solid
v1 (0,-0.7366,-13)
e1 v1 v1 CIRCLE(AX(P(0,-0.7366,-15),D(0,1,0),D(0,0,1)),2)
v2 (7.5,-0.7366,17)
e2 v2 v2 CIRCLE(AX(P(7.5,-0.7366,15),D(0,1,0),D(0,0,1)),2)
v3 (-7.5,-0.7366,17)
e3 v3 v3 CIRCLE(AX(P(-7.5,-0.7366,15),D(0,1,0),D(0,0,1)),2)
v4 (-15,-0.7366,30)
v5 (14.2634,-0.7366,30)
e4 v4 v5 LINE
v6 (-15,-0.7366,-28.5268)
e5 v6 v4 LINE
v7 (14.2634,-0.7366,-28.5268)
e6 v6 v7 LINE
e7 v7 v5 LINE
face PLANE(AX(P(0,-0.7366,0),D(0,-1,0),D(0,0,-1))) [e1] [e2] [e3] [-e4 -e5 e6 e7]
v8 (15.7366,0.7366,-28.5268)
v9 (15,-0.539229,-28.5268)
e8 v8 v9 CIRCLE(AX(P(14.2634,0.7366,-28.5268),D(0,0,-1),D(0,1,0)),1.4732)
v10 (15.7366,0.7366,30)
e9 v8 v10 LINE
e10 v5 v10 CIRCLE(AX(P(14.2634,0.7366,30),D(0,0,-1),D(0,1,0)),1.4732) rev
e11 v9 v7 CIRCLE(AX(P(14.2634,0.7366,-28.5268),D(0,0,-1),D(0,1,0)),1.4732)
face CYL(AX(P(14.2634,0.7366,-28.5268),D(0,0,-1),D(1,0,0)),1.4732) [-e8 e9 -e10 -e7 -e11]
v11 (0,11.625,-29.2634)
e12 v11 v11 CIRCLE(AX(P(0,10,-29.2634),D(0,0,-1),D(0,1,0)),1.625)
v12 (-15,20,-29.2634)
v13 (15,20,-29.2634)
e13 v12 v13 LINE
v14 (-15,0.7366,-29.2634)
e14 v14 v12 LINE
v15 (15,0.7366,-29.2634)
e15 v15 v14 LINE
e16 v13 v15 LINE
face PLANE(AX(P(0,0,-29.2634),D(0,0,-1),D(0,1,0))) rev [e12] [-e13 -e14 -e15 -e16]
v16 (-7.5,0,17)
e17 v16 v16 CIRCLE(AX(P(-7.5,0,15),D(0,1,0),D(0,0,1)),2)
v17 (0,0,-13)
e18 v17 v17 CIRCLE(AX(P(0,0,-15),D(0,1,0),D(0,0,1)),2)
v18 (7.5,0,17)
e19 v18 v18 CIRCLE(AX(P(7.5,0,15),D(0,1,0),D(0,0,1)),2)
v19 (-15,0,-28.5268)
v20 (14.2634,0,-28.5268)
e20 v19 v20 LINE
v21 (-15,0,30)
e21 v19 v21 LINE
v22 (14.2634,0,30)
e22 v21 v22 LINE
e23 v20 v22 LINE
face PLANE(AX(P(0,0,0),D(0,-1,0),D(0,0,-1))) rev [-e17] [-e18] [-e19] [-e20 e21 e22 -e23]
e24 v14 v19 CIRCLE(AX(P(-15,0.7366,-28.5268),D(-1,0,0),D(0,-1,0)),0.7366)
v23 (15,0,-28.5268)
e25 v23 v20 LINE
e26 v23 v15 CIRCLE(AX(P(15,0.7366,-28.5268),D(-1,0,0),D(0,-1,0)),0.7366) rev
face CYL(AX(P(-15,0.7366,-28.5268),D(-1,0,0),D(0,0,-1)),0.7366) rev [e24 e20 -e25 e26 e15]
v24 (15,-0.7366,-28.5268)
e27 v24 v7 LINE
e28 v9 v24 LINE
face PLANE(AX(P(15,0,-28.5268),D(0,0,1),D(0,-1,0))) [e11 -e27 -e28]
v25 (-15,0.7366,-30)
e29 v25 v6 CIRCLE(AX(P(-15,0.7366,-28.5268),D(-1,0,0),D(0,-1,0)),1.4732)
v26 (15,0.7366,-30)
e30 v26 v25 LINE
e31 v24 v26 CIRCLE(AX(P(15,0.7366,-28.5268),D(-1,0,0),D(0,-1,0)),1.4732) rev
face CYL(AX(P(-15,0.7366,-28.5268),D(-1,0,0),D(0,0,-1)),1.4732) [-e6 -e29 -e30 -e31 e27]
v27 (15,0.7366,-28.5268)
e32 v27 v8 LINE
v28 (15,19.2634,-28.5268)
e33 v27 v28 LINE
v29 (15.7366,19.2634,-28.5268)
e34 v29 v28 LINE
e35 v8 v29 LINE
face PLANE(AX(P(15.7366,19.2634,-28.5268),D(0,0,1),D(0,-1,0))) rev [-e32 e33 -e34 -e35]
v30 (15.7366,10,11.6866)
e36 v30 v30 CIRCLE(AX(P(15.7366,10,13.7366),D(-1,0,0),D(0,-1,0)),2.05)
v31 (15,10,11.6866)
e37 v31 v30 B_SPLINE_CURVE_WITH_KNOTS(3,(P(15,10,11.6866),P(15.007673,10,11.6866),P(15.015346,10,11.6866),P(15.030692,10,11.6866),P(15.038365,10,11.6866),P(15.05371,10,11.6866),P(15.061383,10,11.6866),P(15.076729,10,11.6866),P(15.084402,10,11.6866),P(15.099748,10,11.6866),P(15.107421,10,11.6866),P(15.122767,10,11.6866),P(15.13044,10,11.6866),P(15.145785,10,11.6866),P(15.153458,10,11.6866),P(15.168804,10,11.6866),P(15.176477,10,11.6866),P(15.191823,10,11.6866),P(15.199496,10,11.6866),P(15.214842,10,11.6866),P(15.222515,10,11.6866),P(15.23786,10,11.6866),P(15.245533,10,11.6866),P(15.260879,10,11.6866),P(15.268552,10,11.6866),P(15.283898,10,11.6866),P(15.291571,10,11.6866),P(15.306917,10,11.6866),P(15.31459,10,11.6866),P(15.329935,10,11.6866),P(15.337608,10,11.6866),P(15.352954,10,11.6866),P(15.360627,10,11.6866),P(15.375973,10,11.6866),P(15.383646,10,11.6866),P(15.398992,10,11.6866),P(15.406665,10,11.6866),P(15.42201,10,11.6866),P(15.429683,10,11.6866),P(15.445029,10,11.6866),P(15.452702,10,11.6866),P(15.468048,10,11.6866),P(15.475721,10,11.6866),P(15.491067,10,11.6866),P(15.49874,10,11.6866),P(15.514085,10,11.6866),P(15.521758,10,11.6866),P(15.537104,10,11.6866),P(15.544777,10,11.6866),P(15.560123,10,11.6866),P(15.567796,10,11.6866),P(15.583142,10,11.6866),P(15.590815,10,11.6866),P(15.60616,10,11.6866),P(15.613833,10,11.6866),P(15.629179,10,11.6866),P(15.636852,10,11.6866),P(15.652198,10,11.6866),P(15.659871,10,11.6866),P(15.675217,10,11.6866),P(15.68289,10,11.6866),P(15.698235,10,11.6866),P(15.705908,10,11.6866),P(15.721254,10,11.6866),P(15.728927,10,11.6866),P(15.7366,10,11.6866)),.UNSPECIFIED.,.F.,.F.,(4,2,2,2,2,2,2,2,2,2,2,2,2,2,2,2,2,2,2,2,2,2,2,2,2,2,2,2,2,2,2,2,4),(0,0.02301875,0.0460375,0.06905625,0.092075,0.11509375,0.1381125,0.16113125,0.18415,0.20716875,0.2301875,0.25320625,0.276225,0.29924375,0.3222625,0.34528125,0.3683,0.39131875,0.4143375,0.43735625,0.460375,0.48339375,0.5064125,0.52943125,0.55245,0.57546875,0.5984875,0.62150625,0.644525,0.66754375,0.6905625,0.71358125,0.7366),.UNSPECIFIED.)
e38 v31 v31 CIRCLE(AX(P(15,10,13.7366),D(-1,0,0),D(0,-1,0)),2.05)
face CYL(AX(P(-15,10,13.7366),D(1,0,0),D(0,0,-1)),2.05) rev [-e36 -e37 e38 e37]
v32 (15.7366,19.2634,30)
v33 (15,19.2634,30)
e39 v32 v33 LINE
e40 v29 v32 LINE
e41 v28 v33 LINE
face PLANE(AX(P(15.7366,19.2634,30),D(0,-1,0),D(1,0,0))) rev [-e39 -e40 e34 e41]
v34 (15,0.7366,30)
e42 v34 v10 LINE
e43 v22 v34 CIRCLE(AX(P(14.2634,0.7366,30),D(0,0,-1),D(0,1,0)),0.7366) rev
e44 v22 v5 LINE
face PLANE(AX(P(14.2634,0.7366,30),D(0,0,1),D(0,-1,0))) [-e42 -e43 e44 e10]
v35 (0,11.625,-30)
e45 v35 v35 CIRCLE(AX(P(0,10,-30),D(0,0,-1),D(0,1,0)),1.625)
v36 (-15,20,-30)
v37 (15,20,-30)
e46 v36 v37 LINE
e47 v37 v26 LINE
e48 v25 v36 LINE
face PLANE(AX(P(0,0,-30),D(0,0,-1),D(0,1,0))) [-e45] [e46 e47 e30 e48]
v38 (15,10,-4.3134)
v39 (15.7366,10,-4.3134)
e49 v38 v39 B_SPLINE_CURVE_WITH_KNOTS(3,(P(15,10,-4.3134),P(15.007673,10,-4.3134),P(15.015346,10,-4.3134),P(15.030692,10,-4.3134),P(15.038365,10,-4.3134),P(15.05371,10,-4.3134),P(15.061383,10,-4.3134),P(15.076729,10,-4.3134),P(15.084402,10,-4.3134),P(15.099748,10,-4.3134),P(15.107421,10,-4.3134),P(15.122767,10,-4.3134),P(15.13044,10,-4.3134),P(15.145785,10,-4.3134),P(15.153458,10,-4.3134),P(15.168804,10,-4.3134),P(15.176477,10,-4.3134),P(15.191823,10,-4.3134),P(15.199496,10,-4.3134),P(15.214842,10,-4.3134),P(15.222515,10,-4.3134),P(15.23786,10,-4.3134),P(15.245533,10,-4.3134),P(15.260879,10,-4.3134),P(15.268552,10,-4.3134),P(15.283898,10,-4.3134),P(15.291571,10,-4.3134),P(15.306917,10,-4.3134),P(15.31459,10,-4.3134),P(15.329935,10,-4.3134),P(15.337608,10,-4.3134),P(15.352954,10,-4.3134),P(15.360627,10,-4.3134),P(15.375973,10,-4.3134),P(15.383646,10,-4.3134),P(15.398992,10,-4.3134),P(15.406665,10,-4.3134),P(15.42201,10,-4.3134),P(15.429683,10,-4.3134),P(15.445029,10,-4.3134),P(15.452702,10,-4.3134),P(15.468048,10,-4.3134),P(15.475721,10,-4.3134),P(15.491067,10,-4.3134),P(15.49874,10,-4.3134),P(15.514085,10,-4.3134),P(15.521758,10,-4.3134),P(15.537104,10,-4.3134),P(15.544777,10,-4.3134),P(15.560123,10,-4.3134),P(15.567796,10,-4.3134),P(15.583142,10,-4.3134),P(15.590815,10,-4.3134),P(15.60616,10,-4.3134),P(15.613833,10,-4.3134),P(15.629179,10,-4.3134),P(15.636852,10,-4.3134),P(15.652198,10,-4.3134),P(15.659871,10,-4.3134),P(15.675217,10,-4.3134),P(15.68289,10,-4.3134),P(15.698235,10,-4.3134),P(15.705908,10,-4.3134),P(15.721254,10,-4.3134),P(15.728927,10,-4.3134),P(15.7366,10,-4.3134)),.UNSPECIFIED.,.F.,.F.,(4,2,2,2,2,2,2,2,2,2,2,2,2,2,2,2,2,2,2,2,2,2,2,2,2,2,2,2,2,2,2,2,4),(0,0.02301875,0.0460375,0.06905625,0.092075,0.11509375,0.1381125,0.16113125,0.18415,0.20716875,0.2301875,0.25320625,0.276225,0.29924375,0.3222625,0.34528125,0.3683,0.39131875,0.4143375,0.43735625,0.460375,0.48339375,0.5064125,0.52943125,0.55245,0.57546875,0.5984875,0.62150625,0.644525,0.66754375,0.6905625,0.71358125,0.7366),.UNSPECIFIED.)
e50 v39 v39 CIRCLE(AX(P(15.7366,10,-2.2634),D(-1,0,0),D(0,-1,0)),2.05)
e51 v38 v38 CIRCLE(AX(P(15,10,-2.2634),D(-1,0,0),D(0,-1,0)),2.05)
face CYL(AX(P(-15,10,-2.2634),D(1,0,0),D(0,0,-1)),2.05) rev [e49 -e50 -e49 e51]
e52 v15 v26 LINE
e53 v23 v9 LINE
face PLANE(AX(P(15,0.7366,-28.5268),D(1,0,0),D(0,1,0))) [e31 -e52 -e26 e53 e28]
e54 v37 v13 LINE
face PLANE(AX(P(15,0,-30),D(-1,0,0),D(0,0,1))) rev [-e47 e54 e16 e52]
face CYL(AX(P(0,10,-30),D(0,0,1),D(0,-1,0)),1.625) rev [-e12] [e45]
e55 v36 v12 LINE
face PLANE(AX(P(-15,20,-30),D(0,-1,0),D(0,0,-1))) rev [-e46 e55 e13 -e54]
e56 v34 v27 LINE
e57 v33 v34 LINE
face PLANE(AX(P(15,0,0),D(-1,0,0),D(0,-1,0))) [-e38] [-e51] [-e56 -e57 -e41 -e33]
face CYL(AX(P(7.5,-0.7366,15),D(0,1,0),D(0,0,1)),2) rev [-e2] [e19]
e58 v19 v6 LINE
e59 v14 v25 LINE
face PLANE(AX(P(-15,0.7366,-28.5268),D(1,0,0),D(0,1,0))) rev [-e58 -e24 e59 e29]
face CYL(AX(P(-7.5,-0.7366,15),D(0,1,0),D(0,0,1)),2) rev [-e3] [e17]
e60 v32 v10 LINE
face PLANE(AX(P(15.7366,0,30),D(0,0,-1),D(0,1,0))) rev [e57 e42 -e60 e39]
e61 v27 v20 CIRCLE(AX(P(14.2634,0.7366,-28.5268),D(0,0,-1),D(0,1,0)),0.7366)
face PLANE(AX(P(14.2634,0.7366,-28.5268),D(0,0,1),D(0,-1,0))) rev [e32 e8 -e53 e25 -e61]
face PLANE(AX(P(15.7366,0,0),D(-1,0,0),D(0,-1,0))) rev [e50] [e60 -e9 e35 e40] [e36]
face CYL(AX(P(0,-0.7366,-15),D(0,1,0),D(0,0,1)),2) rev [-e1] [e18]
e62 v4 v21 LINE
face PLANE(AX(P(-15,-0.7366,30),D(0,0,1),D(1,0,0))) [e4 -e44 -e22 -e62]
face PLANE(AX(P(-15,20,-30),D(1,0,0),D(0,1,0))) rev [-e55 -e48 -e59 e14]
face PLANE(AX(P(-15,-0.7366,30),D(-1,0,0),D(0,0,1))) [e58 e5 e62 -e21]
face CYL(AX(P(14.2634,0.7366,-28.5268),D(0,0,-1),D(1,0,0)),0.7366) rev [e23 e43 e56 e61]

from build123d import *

# Parameters (mm, degrees)
SKETCH1_W                    = 30
SKETCH1_H                    = 60
SKETCH1_R                    = 2
BASE_FLANGE1_DEPTH           = 0.7366
EDGE_FLANGE1_STRIP_W         = 4.4196
EDGE_FLANGE1_STRIP_H         = 0.7366
EDGE_FLANGE1_STRIP_CUT_DEPTH = 30
EDGE_FLANGE1_DEPTH           = 30
EDGE_FLANGE1_PROFILE_W       = 30
EDGE_FLANGE1_PROFILE_H       = 19.2634
EDGE_FLANGE1_PROFILE_R       = 1.625
EDGE_FLANGE1_FLAT_DEPTH      = 0.7366
EDGE_FLANGE6_STRIP_W         = 4.4196
EDGE_FLANGE6_STRIP_H         = 0.7366
EDGE_FLANGE6_STRIP_CUT_DEPTH = 58.5268
EDGE_FLANGE6_DEPTH           = 58.5268
SKETCH24_R                   = 2.05
CUT_EXTRUDE1_DEPTH           = 409.183232337


# Sheet-metal steps are written as plain solids
with BuildPart() as part:
    # Sketch1 → Base-Flange1 (new body)
    with BuildSketch(Plane(origin=(0, 0, 0), x_dir=(1, 0, 0), z_dir=(0, 1, 0))):
        Rectangle(SKETCH1_W, SKETCH1_H)
        with Locations(Location((7.5, -15, 0), (0, 0, 270))):
            Circle(SKETCH1_R, mode=Mode.SUBTRACT)
        with Locations(Location((0, 15, 0), (0, 0, 270))):
            Circle(SKETCH1_R, mode=Mode.SUBTRACT)
        with Locations(Location((-7.5, -15, 0), (0, 0, 270))):
            Circle(SKETCH1_R, mode=Mode.SUBTRACT)
    extrude(amount=-BASE_FLANGE1_DEPTH)

    # Edge-Flange1 strip (across the edge) → Edge-Flange1 strip cut (cut)
    with BuildSketch(Plane(origin=(15, 0, -30), x_dir=(0, 0, 1), z_dir=(-1, 0, 0))):
        with Locations((-0.7366, -0.3683)):
            Rectangle(EDGE_FLANGE1_STRIP_W, EDGE_FLANGE1_STRIP_H)
    extrude(amount=EDGE_FLANGE1_STRIP_CUT_DEPTH, mode=Mode.SUBTRACT)

    # Edge-Flange1 bend section (across the edge) → Edge-Flange1 (add)
    with BuildSketch(Plane(origin=(15, 0, -30), x_dir=(0, 0, 1), z_dir=(-1, 0, 0))):
        with BuildLine():
            Line((0, 0.7366), (0.7366, 0.7366))
            ThreePointArc((0.7366, 0.7366), (0.952345145, 0.215745145), (1.4732, 0))
            Line((1.4732, 0), (1.4732, -0.7366))
            ThreePointArc((1.4732, -0.7366), (0.43149029, -0.30510971), (0, 0.7366))
        make_face()
    extrude(amount=EDGE_FLANGE1_DEPTH)

    # Edge-Flange1 profile (on flange) → Edge-Flange1 flat (add)
    with BuildSketch(Plane(origin=(0, 0, -30), x_dir=(-1, 0, 0), z_dir=(0, 0, -1))):
        with Locations((0, 10.3683)):
            Rectangle(EDGE_FLANGE1_PROFILE_W, EDGE_FLANGE1_PROFILE_H)
        with Locations((0, 10)):
            Circle(EDGE_FLANGE1_PROFILE_R, mode=Mode.SUBTRACT)
    extrude(amount=-EDGE_FLANGE1_FLAT_DEPTH)

    # Edge-Flange6 strip (across the edge) → Edge-Flange6 strip cut (cut)
    with BuildSketch(Plane(origin=(15, 0, 30), x_dir=(-1, 0, 0), z_dir=(0, 0, -1))):
        with Locations((-1.4732, -0.3683)):
            Rectangle(EDGE_FLANGE6_STRIP_W, EDGE_FLANGE6_STRIP_H)
    extrude(amount=EDGE_FLANGE6_STRIP_CUT_DEPTH, mode=Mode.SUBTRACT)

    # Edge-Flange6 section (across the edge) → Edge-Flange6 (add)
    with BuildSketch(Plane(origin=(15, 0, 30), x_dir=(-1, 0, 0), z_dir=(0, 0, -1))):
        with BuildLine():
            Line((-0.7366, 0.7366), (-0.7366, 19.2634))
            Line((-0.7366, 19.2634), (0, 19.2634))
            Line((0, 19.2634), (0, 0.7366))
            ThreePointArc((0, 0.7366), (0.215745145, 0.215745145), (0.7366, 0))
            Line((0.7366, 0), (0.7366, -0.7366))
            ThreePointArc((0.7366, -0.7366), (-0.30510971, -0.30510971), (-0.7366, 0.7366))
        make_face()
    extrude(amount=EDGE_FLANGE6_DEPTH)

    # Sketch24 → Cut-Extrude1 (cut, through all)
    with BuildSketch(Plane(origin=(385, -11.740421973, -44.873872437), x_dir=(0, 0, -1), z_dir=(1, 0, 0))):
        with Locations((-42.610472437, 21.740421973)):
            Circle(SKETCH24_R)
        with Locations((-58.610472437, 21.740421973)):
            Circle(SKETCH24_R)
    extrude(amount=-CUT_EXTRUDE1_DEPTH, mode=Mode.SUBTRACT)


solid = part.part
